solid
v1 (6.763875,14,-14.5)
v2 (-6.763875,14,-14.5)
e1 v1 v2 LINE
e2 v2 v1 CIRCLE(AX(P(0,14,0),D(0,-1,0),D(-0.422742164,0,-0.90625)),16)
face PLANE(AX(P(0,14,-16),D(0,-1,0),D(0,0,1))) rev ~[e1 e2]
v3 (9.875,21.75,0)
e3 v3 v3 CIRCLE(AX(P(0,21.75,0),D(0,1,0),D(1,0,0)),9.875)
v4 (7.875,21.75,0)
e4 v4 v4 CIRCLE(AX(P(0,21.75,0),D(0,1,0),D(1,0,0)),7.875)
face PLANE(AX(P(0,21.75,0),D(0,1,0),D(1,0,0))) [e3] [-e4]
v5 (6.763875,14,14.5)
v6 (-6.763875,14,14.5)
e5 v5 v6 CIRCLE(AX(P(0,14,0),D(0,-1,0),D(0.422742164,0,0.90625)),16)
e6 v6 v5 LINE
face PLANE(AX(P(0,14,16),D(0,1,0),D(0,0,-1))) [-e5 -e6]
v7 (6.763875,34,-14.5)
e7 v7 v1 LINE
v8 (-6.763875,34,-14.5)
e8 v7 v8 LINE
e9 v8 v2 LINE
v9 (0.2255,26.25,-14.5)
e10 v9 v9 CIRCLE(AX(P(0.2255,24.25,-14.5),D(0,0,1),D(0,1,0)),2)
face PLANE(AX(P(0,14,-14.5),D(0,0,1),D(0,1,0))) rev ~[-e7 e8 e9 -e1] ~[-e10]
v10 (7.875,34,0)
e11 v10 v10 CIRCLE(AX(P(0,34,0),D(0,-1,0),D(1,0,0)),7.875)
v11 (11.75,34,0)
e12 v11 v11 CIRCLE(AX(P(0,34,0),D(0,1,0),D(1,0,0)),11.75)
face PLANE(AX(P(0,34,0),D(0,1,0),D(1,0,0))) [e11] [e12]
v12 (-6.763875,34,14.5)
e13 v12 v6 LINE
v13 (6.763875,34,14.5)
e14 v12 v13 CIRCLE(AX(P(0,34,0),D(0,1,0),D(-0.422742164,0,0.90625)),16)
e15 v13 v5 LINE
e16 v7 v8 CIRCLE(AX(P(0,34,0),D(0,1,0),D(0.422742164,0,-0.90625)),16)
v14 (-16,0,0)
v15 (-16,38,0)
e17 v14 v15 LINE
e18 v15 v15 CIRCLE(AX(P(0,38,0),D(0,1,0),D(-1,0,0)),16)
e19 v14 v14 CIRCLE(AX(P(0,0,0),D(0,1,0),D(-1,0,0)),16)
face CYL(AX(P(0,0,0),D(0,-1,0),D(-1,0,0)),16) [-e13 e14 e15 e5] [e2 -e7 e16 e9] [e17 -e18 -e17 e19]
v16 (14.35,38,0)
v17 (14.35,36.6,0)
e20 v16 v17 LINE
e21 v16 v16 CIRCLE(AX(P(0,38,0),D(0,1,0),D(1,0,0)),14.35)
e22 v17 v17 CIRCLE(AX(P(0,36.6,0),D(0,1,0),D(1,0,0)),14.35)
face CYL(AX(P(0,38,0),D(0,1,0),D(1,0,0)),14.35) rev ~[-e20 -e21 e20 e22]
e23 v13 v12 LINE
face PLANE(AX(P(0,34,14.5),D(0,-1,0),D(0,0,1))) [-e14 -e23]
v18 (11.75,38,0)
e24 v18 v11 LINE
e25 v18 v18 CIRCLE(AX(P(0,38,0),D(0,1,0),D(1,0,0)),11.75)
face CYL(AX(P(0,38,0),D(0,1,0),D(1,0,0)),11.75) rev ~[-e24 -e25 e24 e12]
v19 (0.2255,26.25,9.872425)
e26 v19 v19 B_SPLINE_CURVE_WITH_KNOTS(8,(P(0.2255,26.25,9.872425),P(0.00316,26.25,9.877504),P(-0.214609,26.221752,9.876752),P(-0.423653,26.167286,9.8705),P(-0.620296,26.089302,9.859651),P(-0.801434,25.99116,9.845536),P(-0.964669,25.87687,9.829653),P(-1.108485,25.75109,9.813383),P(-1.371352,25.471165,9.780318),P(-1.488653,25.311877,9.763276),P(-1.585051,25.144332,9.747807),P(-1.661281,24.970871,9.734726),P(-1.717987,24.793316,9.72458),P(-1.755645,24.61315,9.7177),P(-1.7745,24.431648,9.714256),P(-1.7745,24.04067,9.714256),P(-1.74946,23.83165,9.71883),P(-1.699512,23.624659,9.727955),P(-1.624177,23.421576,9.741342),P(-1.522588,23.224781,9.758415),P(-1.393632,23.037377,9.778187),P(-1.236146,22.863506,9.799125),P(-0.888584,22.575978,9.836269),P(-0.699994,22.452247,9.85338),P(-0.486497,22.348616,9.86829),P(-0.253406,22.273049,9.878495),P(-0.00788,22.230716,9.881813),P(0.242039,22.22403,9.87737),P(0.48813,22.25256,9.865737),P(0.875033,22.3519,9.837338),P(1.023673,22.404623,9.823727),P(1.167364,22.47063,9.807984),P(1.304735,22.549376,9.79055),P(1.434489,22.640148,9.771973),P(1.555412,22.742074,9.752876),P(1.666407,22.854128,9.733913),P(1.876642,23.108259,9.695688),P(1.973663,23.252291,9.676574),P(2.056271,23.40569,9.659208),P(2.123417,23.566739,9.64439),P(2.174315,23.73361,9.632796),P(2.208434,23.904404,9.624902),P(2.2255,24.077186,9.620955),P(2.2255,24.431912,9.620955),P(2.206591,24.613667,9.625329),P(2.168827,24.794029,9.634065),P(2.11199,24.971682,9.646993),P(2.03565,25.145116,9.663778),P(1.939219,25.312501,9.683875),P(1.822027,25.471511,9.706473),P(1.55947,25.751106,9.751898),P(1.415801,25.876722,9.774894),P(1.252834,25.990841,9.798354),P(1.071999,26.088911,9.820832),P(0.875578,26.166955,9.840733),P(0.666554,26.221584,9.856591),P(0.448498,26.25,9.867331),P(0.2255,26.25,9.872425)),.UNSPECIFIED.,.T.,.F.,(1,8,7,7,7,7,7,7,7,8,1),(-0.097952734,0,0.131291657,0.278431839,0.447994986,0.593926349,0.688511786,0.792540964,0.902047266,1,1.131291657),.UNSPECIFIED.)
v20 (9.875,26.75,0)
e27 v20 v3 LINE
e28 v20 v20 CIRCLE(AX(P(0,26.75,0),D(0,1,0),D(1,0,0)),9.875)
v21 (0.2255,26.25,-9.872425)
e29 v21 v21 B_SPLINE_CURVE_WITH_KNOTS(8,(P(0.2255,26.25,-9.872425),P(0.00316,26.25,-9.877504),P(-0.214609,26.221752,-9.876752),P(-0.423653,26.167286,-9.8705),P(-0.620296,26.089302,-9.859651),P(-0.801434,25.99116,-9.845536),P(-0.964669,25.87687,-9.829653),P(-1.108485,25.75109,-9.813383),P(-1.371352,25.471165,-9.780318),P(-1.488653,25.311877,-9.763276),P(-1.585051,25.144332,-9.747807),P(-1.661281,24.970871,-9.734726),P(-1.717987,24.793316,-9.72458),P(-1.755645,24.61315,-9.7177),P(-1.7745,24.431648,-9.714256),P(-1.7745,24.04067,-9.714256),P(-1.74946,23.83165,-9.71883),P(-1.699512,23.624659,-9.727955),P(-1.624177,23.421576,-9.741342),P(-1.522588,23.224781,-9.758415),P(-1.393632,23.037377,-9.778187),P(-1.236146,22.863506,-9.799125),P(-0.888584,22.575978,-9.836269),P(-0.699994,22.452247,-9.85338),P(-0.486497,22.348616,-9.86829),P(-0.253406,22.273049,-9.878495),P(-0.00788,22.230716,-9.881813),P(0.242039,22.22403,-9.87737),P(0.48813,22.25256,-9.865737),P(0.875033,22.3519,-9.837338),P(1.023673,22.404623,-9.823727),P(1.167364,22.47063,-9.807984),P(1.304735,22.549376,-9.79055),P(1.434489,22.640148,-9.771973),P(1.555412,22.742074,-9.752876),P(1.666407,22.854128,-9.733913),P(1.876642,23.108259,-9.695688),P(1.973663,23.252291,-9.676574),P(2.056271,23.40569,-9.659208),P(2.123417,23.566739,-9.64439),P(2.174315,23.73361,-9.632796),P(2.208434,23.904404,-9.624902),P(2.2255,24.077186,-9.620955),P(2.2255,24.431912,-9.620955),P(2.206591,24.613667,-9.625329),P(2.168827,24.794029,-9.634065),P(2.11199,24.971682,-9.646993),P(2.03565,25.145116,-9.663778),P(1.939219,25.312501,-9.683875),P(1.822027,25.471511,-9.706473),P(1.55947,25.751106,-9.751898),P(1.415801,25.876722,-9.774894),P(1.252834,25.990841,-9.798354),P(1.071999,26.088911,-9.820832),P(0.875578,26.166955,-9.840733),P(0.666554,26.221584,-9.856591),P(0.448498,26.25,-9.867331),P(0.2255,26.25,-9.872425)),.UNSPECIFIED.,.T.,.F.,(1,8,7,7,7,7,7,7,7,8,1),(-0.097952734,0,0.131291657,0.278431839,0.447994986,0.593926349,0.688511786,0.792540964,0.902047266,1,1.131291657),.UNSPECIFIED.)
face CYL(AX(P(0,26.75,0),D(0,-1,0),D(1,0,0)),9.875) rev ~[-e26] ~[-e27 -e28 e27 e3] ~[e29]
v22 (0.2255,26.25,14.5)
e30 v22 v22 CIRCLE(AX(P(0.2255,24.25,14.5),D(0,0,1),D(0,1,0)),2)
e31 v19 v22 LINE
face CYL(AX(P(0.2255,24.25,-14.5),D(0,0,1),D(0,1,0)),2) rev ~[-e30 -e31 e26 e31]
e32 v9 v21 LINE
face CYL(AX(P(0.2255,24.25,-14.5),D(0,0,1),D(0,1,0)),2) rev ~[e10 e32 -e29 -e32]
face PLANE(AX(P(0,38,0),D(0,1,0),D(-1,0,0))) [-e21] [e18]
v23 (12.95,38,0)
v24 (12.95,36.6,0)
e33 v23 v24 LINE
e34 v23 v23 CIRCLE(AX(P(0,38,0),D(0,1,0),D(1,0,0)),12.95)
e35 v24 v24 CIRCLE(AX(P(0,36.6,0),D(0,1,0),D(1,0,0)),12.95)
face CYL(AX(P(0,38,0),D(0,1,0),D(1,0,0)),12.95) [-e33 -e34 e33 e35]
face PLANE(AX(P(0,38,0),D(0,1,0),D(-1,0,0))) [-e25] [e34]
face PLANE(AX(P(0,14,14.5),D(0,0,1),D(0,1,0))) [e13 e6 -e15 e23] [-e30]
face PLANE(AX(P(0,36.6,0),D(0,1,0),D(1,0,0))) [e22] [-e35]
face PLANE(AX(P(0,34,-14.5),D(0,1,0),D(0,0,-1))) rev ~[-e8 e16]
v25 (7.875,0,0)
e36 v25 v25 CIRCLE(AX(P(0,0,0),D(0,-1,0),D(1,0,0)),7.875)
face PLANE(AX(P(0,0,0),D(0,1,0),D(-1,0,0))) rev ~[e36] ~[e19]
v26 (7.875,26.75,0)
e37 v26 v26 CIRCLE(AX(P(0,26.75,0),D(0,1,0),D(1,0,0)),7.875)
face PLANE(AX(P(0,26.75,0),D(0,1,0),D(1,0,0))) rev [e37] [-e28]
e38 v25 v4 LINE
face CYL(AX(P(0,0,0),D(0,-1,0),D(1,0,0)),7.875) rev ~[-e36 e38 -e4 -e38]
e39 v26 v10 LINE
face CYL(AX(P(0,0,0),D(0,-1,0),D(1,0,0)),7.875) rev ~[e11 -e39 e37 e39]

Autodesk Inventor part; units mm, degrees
ref_plane "YZ Plane" through (0, 0, 0) normal (1, 0, 0) x (0, 1, 0)
ref_plane "XZ Plane" through (0, 0, 0) normal (0, 1, 0) x (-1, 0, 0)
ref_plane "XY Plane" through (0, 0, 0) normal (0, 0, 1) x (1, 0, 0)
sketch "Sketch1" plane through (0, 0, 0) normal (0, 1, 0) x (-1, 0, 0)
  circle A0 centre (0, 0) radius 16
  dimension "d0" = 32
extrude "Extrusion1" add sketch "Sketch1" along normal blind 38
thread "Thread1" size "M32x1.5" class "6g" standard "ANSI Metric M Profile" length 12
sketch "Sketch2" plane through (0, 0, 0) normal (0, -1, 0) x (1, 0, 0)
  circle A0 centre (0, 0) radius 7.875
  dimension "d5" = 15.75
extrude "Extrusion2" cut sketch "Sketch2" against normal through all
sketch "Sketch3" plane through (0, 38, 0) normal (0, 1, 0) x (1, 0, 0)
  circle A0 centre (0, 0) radius 11.75
  dimension "d8" = 23.5
extrude "Extrusion3" cut sketch "Sketch3" against normal blind 4
sketch "Sketch4" plane through (0, 0, 0) normal (1, 0, 0) x (0, 1, 0)
  line L0 (0, 16) -> (38, 16) projected
  line L1 (34, 16) -> (14, 16)
  line L2 (14, 16) -> (14, 14.5)
  line L3 (14, 14.5) -> (34, 14.5)
  line L4 (34, 14.5) -> (34, 16)
  line L5 (0, -16) -> (38, -16) projected
  line L6 (34, -16) -> (14, -16)
  line L7 (14, -16) -> (14, -14.5)
  line L8 (14, -14.5) -> (34, -14.5)
  line L9 (34, -14.5) -> (34, -16)
  line L10 (38, -16) -> (38, 16) projected
  point P0 (0, 0)
  point P1 (14, 16)
  point P2 (14, -16)
  dimension "d11" = 20
  dimension "d12" = 1.5
  dimension "d13" = 1.5
  dimension "d33" = 4
extrude "Extrusion4" cut sketch "Sketch4" along normal through all both and the other way through all
sketch "Sketch5" plane through (0, 0, 0) normal (0, 0, 1) x (1, 0, 0)
  line L0 (7.875, 0) -> (7.875, 34) projected
  line L1 (7.875, 26.75) -> (9.875, 26.75)
  line L2 (9.875, 26.75) -> (9.875, 21.75)
  line L3 (9.875, 21.75) -> (7.875, 21.75)
  line L4 (7.875, 21.75) -> (7.875, 26.75)
  line L5 (0, -5.7834) -> (0, 45.928)
  line L6 (-11.75, 38) -> (11.75, 38) projected
  point P0 (0, 0)
  point P1 (7.875, 21.75)
  dimension "d17" = 11.25
  dimension "d18" = 16.25
  dimension "d19" = 2
revolve "Revolution1" cut sketch "Sketch5" angle 360 about axis through (0, -5.7834, 0) along (0, 1, 0)
sketch "Sketch6" plane through (6.7639, 34, -14.5) normal (0, 0, -1) x (-1, 0, 0)
  line L0 (-3.1111, -7.25) -> (16.6389, -7.25) projected
  line L1 (-3.1111, -12.25) -> (16.6389, -12.25) projected
  point P0 (6.7639, -34)
  point P1 (6.5383, -9.75)
  dimension "d20" = 5
  dimension "d21" = 2.5
hole "Hole1" at (0.2255, 24.25, -14.5) direction (0, 0, 1) diameter 4 end through all
sketch "Sketch7" plane through (0, 38, 0) normal (0, 1, 0) x (1, 0, 0)
  circle A0 centre (0, 0) radius 12.95
  circle A1 centre (0, 0) radius 14.35
  circle A2 centre (0, 0) radius 11.75 projected
  dimension "d29" = 1.2
  dimension "d30" = 1.4
extrude "Extrusion5" cut sketch "Sketch7" against normal blind 1.4 contours A1
equation "\"d21\" = 0.5 * d20"
properties part number "Passthrough Base Insert" material "Aluminum 6061"
